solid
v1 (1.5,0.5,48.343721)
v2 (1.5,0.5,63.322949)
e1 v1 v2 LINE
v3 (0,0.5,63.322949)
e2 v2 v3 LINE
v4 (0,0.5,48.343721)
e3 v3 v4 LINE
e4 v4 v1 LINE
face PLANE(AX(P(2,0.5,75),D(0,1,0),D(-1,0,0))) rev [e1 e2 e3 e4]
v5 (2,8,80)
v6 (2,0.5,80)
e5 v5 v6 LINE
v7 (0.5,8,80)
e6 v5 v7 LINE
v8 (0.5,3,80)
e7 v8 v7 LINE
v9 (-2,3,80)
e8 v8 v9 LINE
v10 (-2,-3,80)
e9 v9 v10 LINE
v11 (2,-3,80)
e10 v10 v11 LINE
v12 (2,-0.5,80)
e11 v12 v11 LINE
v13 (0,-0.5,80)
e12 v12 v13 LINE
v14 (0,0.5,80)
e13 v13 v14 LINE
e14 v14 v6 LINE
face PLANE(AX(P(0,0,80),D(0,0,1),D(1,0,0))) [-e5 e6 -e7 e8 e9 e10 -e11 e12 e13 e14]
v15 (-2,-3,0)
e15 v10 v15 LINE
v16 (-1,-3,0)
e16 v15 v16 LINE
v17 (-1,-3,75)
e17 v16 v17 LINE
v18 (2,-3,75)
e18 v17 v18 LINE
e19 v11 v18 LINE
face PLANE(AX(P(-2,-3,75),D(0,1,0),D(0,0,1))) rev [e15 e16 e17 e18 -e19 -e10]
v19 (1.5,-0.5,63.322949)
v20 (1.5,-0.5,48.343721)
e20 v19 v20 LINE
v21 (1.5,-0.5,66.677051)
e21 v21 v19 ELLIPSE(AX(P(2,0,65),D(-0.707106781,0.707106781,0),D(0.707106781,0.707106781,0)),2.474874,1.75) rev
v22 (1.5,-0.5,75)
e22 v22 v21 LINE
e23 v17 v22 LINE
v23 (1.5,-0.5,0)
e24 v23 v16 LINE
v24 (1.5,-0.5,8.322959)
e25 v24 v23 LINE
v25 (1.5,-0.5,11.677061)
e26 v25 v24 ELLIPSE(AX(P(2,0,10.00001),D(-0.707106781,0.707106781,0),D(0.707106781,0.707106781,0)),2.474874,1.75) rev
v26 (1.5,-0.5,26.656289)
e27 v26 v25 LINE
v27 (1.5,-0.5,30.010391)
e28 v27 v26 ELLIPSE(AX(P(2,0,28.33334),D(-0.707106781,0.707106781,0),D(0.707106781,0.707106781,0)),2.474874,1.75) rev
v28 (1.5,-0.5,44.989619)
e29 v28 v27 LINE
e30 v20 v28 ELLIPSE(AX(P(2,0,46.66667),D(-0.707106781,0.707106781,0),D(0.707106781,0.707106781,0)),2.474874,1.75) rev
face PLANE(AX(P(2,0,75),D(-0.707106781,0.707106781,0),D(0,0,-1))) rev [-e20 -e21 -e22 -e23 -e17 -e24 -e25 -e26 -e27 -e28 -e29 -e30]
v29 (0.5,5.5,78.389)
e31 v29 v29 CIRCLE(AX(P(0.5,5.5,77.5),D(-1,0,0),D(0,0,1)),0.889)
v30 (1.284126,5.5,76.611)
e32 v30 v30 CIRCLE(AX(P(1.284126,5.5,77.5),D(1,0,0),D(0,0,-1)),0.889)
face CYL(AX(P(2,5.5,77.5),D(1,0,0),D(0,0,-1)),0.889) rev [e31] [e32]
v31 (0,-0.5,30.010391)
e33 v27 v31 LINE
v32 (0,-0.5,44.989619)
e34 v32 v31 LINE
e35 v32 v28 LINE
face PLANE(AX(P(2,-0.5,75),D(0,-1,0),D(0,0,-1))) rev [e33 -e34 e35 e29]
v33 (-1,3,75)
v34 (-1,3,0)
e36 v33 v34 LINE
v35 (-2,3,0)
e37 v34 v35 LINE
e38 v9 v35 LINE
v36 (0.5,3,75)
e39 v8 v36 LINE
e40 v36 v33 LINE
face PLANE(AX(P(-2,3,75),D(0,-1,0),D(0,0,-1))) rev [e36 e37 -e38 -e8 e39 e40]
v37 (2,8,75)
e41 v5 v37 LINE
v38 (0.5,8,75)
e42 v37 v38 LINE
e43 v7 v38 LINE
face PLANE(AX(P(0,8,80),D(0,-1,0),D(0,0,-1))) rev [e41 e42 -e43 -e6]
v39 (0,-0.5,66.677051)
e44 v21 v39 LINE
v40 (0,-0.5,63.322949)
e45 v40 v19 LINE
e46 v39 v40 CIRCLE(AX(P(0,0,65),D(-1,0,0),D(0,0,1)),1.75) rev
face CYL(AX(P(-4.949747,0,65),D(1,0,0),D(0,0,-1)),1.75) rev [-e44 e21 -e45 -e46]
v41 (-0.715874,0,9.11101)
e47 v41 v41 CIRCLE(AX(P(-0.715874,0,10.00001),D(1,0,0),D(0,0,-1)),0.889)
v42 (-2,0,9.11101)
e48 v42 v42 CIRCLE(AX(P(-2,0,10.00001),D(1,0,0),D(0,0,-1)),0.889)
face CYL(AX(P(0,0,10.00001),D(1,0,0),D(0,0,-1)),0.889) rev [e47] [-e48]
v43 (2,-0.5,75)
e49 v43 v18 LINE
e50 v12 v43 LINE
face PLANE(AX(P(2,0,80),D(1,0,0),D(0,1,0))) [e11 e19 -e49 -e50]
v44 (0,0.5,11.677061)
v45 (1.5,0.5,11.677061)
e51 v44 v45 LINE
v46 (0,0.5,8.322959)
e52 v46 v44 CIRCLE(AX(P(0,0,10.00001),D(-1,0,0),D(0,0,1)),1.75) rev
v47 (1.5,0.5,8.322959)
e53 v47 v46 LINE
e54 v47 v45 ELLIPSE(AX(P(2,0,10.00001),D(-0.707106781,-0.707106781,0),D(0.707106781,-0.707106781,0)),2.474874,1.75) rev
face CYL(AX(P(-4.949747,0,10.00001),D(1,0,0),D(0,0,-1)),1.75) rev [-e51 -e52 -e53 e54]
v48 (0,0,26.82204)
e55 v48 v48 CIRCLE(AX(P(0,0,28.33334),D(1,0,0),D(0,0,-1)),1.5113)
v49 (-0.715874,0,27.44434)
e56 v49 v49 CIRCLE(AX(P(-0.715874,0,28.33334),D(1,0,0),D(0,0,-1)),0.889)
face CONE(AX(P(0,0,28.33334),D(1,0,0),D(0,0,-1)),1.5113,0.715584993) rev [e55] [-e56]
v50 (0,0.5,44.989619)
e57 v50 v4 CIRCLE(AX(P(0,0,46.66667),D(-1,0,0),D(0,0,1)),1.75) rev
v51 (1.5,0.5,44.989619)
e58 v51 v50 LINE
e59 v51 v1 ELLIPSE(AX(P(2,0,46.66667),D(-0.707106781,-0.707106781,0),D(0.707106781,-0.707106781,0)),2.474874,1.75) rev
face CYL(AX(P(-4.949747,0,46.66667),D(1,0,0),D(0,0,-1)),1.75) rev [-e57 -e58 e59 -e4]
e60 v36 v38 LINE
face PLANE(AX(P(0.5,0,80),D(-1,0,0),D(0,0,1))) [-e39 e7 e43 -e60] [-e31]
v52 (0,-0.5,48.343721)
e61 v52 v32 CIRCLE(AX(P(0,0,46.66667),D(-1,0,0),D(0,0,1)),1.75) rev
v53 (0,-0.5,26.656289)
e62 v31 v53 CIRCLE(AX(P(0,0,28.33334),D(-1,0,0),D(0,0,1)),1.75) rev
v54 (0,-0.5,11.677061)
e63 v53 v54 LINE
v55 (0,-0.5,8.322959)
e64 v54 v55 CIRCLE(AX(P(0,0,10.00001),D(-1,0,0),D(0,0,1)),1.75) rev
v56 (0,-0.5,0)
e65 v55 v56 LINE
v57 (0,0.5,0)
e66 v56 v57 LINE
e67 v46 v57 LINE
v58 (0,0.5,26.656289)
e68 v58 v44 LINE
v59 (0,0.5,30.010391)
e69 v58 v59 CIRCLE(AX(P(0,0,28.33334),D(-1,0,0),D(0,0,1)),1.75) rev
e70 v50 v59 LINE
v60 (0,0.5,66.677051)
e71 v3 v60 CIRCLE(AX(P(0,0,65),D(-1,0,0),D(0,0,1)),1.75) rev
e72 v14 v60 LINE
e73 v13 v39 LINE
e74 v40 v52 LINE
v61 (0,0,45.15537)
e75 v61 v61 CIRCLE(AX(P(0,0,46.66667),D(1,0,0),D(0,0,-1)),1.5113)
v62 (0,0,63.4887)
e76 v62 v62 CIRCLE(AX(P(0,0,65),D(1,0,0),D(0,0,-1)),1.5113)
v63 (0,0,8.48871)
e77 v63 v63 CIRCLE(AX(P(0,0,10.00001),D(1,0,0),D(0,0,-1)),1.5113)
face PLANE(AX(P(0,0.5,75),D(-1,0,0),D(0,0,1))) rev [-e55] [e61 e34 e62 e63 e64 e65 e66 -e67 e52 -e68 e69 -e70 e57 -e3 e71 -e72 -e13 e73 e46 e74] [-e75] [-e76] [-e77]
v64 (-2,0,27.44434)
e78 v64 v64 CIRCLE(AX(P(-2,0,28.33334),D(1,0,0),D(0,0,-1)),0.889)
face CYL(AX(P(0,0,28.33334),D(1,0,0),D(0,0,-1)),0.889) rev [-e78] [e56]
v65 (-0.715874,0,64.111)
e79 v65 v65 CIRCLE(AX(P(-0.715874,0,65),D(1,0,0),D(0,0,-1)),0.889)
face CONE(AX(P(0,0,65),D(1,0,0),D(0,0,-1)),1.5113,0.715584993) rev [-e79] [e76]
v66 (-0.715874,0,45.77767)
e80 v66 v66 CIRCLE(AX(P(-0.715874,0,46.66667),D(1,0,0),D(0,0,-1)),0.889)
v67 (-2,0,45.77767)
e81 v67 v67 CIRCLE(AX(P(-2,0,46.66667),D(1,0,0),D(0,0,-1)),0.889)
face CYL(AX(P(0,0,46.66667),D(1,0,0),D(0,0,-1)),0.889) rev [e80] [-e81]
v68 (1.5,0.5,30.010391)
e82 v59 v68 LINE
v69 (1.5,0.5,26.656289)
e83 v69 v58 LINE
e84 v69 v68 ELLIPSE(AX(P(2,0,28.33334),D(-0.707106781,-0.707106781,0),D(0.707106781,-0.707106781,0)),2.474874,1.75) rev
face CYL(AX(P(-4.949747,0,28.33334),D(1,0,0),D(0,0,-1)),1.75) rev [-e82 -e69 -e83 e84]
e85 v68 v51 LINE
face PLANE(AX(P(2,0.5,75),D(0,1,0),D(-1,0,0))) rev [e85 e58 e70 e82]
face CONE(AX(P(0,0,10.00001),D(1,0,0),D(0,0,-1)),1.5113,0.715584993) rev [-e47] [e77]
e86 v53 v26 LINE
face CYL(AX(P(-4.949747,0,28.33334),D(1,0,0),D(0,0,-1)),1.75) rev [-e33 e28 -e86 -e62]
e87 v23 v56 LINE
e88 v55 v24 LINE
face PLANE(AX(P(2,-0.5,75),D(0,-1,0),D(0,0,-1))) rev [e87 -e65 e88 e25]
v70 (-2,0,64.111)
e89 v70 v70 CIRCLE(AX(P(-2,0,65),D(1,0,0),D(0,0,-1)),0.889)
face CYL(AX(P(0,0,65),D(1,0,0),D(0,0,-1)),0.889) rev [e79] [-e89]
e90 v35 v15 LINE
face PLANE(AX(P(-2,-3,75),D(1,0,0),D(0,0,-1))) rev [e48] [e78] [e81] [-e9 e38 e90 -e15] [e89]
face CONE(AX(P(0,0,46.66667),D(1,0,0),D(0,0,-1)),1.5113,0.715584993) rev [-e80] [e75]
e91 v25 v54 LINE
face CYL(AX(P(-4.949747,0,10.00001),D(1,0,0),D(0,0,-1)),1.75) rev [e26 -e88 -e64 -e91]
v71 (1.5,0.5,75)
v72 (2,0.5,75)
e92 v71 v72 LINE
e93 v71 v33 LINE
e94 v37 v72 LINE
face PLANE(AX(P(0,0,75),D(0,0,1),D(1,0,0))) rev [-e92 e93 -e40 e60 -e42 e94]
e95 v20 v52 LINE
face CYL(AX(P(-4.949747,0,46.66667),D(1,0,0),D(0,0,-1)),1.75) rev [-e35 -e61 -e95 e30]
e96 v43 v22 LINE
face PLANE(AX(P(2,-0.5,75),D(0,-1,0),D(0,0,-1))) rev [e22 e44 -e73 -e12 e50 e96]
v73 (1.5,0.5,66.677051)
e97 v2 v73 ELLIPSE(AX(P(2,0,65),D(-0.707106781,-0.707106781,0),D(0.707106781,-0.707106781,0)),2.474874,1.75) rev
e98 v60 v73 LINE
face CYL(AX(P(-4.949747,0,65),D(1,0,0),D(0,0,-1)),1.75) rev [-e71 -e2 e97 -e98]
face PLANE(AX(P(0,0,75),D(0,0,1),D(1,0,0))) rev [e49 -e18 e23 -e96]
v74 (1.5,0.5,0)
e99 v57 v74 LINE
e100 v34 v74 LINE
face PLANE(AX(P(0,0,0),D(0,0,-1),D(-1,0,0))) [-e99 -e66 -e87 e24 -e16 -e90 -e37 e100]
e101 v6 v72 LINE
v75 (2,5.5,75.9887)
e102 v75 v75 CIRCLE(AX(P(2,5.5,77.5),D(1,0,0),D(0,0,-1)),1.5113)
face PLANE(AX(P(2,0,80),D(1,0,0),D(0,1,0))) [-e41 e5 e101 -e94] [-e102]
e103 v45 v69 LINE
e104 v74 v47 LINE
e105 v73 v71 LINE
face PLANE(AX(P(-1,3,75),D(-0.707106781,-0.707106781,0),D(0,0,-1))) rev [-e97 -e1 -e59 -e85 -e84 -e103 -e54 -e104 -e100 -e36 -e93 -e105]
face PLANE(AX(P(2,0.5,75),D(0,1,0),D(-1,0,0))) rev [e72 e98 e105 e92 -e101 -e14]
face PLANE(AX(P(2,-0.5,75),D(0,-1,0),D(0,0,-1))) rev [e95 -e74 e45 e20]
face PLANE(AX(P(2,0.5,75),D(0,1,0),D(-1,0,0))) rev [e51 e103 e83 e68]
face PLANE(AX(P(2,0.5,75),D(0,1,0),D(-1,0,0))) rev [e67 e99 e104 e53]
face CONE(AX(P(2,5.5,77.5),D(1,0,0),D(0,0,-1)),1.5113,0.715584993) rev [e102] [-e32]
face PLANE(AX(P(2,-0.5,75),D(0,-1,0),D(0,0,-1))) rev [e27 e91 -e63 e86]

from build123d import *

# Parameters (mm, degrees)
BOSS_EXTRUDE1_DEPTH                            = 75
SKETCH5_R                                      = 1.75
CUT_EXTRUDE1_DEPTH                             = 2
CSK_FOR_0_FLAT_HEAD_MACHINE_SCREW2_D           = 1.778
CSK_FOR_0_FLAT_HEAD_MACHINE_SCREW2_DEPTH       = 3.302
CSK_FOR_0_FLAT_HEAD_MACHINE_SCREW2_CSINK_D     = 3.0226
CSK_FOR_0_FLAT_HEAD_MACHINE_SCREW2_CSINK_ANGLE = 82
CSK_FOR_0_FLAT_HEAD_MACHINE_SCREW2_TIP         = 0.53416509
CHAMFER1_SIZE                                  = 3
SKETCH6_W                                      = 1.5
SKETCH6_H                                      = 5
BOSS_EXTRUDE2_DEPTH                            = 5
CSK_FOR_0_FLAT_HEAD_MACHINE_SCREW1_D           = 1.778
CSK_FOR_0_FLAT_HEAD_MACHINE_SCREW1_DEPTH       = 3.302
CSK_FOR_0_FLAT_HEAD_MACHINE_SCREW1_CSINK_D     = 3.0226
CSK_FOR_0_FLAT_HEAD_MACHINE_SCREW1_CSINK_ANGLE = 82
CSK_FOR_0_FLAT_HEAD_MACHINE_SCREW1_TIP         = 0.53416509


with BuildPart() as part:
    # Sketch1 → Boss-Extrude1 (new body)
    with BuildSketch(Plane.XY):
        Polygon((-2, -3), (2, -3), (2, -0.5), (0, -0.5), (0, 0.5), (2, 0.5), (2, 3), (-2, 3), align=None)
    extrude(amount=BOSS_EXTRUDE1_DEPTH)

    # Sketch5 → Cut-Extrude1 (cut)
    with BuildSketch(Plane(origin=(2, 0, 0), x_dir=(0, 0, -1), z_dir=(1, 0, 0))):
        with Locations((-65, 0)):
            Circle(SKETCH5_R)
        with Locations((-46.66667, 0)):
            Circle(SKETCH5_R)
        with Locations((-28.33334, 0)):
            Circle(SKETCH5_R)
        with Locations((-10.00001, 0)):
            Circle(SKETCH5_R)
    extrude(amount=-CUT_EXTRUDE1_DEPTH, mode=Mode.SUBTRACT)

    # CSK for #0 Flat Head Machine Screw2
    with Locations(Plane(origin=(0, 0, 0), x_dir=(0, 0, -1), z_dir=(1, 0, 0))):
        with Locations((-65, 0), (-10.00001, 0), (-46.66667, 0), (-28.33334, 0)):
            CounterSinkHole(CSK_FOR_0_FLAT_HEAD_MACHINE_SCREW2_D / 2, CSK_FOR_0_FLAT_HEAD_MACHINE_SCREW2_CSINK_D / 2, depth=CSK_FOR_0_FLAT_HEAD_MACHINE_SCREW2_DEPTH, counter_sink_angle=CSK_FOR_0_FLAT_HEAD_MACHINE_SCREW2_CSINK_ANGLE)
            with Locations((0, 0, -(CSK_FOR_0_FLAT_HEAD_MACHINE_SCREW2_DEPTH + CSK_FOR_0_FLAT_HEAD_MACHINE_SCREW2_TIP / 2))):  # 118° drill point
                Cone(0, CSK_FOR_0_FLAT_HEAD_MACHINE_SCREW2_D / 2, CSK_FOR_0_FLAT_HEAD_MACHINE_SCREW2_TIP, mode=Mode.SUBTRACT)

    # Chamfer1
    # the kernel refuses this chamfer: 3 mm, written as the material it takes off along each edge
    with BuildSketch(Plane(origin=(2, -3, -7.715048964), x_dir=(-0.9996219169112968, -0.027495876610586348, 0), z_dir=(0, 0, 1))) as chamfer1_piece_1:
        Polygon((CHAMFER1_SIZE * 0.999621916911, -CHAMFER1_SIZE * 0.0274958766106), (-CHAMFER1_SIZE * 0.0274958766106, -CHAMFER1_SIZE * 0.999621916911), (0, 0), align=None)
    extrude(amount=90.430097928, mode=Mode.SUBTRACT)
    with BuildSketch(Plane(origin=(2, 3, -7.715048964), x_dir=(-0.9996219169112968, 0.027495876610586348, 0), z_dir=(0, 0, 1))) as chamfer1_piece_2:
        Polygon((CHAMFER1_SIZE * 0.999621916911, CHAMFER1_SIZE * 0.0274958766106), (-CHAMFER1_SIZE * 0.0274958766106, CHAMFER1_SIZE * 0.999621916911), (0, 0), align=None)
    extrude(amount=90.430097928, mode=Mode.SUBTRACT)

    # Sketch6 → Boss-Extrude2 (add)
    with BuildSketch(Plane.XY.offset(75)):
        Polygon((2, 0.5), (2, 3), (0.5, 3), (-2, 3), (-2, -3), (2, -3), (2, -0.5), (0, -0.5), (0, 0.5), align=None)
        with Locations((1.25, 5.5)):
            Rectangle(SKETCH6_W, SKETCH6_H)
    extrude(amount=BOSS_EXTRUDE2_DEPTH)

    # CSK for #0 Flat Head Machine Screw1
    with Locations(Plane(origin=(2, 0, 0), x_dir=(0, 0, -1), z_dir=(1, 0, 0))):
        with Locations((-77.5, 5.5)):
            CounterSinkHole(CSK_FOR_0_FLAT_HEAD_MACHINE_SCREW1_D / 2, CSK_FOR_0_FLAT_HEAD_MACHINE_SCREW1_CSINK_D / 2, depth=CSK_FOR_0_FLAT_HEAD_MACHINE_SCREW1_DEPTH, counter_sink_angle=CSK_FOR_0_FLAT_HEAD_MACHINE_SCREW1_CSINK_ANGLE)
            with Locations((0, 0, -(CSK_FOR_0_FLAT_HEAD_MACHINE_SCREW1_DEPTH + CSK_FOR_0_FLAT_HEAD_MACHINE_SCREW1_TIP / 2))):  # 118° drill point
                Cone(0, CSK_FOR_0_FLAT_HEAD_MACHINE_SCREW1_D / 2, CSK_FOR_0_FLAT_HEAD_MACHINE_SCREW1_TIP, mode=Mode.SUBTRACT)


solid = part.part
